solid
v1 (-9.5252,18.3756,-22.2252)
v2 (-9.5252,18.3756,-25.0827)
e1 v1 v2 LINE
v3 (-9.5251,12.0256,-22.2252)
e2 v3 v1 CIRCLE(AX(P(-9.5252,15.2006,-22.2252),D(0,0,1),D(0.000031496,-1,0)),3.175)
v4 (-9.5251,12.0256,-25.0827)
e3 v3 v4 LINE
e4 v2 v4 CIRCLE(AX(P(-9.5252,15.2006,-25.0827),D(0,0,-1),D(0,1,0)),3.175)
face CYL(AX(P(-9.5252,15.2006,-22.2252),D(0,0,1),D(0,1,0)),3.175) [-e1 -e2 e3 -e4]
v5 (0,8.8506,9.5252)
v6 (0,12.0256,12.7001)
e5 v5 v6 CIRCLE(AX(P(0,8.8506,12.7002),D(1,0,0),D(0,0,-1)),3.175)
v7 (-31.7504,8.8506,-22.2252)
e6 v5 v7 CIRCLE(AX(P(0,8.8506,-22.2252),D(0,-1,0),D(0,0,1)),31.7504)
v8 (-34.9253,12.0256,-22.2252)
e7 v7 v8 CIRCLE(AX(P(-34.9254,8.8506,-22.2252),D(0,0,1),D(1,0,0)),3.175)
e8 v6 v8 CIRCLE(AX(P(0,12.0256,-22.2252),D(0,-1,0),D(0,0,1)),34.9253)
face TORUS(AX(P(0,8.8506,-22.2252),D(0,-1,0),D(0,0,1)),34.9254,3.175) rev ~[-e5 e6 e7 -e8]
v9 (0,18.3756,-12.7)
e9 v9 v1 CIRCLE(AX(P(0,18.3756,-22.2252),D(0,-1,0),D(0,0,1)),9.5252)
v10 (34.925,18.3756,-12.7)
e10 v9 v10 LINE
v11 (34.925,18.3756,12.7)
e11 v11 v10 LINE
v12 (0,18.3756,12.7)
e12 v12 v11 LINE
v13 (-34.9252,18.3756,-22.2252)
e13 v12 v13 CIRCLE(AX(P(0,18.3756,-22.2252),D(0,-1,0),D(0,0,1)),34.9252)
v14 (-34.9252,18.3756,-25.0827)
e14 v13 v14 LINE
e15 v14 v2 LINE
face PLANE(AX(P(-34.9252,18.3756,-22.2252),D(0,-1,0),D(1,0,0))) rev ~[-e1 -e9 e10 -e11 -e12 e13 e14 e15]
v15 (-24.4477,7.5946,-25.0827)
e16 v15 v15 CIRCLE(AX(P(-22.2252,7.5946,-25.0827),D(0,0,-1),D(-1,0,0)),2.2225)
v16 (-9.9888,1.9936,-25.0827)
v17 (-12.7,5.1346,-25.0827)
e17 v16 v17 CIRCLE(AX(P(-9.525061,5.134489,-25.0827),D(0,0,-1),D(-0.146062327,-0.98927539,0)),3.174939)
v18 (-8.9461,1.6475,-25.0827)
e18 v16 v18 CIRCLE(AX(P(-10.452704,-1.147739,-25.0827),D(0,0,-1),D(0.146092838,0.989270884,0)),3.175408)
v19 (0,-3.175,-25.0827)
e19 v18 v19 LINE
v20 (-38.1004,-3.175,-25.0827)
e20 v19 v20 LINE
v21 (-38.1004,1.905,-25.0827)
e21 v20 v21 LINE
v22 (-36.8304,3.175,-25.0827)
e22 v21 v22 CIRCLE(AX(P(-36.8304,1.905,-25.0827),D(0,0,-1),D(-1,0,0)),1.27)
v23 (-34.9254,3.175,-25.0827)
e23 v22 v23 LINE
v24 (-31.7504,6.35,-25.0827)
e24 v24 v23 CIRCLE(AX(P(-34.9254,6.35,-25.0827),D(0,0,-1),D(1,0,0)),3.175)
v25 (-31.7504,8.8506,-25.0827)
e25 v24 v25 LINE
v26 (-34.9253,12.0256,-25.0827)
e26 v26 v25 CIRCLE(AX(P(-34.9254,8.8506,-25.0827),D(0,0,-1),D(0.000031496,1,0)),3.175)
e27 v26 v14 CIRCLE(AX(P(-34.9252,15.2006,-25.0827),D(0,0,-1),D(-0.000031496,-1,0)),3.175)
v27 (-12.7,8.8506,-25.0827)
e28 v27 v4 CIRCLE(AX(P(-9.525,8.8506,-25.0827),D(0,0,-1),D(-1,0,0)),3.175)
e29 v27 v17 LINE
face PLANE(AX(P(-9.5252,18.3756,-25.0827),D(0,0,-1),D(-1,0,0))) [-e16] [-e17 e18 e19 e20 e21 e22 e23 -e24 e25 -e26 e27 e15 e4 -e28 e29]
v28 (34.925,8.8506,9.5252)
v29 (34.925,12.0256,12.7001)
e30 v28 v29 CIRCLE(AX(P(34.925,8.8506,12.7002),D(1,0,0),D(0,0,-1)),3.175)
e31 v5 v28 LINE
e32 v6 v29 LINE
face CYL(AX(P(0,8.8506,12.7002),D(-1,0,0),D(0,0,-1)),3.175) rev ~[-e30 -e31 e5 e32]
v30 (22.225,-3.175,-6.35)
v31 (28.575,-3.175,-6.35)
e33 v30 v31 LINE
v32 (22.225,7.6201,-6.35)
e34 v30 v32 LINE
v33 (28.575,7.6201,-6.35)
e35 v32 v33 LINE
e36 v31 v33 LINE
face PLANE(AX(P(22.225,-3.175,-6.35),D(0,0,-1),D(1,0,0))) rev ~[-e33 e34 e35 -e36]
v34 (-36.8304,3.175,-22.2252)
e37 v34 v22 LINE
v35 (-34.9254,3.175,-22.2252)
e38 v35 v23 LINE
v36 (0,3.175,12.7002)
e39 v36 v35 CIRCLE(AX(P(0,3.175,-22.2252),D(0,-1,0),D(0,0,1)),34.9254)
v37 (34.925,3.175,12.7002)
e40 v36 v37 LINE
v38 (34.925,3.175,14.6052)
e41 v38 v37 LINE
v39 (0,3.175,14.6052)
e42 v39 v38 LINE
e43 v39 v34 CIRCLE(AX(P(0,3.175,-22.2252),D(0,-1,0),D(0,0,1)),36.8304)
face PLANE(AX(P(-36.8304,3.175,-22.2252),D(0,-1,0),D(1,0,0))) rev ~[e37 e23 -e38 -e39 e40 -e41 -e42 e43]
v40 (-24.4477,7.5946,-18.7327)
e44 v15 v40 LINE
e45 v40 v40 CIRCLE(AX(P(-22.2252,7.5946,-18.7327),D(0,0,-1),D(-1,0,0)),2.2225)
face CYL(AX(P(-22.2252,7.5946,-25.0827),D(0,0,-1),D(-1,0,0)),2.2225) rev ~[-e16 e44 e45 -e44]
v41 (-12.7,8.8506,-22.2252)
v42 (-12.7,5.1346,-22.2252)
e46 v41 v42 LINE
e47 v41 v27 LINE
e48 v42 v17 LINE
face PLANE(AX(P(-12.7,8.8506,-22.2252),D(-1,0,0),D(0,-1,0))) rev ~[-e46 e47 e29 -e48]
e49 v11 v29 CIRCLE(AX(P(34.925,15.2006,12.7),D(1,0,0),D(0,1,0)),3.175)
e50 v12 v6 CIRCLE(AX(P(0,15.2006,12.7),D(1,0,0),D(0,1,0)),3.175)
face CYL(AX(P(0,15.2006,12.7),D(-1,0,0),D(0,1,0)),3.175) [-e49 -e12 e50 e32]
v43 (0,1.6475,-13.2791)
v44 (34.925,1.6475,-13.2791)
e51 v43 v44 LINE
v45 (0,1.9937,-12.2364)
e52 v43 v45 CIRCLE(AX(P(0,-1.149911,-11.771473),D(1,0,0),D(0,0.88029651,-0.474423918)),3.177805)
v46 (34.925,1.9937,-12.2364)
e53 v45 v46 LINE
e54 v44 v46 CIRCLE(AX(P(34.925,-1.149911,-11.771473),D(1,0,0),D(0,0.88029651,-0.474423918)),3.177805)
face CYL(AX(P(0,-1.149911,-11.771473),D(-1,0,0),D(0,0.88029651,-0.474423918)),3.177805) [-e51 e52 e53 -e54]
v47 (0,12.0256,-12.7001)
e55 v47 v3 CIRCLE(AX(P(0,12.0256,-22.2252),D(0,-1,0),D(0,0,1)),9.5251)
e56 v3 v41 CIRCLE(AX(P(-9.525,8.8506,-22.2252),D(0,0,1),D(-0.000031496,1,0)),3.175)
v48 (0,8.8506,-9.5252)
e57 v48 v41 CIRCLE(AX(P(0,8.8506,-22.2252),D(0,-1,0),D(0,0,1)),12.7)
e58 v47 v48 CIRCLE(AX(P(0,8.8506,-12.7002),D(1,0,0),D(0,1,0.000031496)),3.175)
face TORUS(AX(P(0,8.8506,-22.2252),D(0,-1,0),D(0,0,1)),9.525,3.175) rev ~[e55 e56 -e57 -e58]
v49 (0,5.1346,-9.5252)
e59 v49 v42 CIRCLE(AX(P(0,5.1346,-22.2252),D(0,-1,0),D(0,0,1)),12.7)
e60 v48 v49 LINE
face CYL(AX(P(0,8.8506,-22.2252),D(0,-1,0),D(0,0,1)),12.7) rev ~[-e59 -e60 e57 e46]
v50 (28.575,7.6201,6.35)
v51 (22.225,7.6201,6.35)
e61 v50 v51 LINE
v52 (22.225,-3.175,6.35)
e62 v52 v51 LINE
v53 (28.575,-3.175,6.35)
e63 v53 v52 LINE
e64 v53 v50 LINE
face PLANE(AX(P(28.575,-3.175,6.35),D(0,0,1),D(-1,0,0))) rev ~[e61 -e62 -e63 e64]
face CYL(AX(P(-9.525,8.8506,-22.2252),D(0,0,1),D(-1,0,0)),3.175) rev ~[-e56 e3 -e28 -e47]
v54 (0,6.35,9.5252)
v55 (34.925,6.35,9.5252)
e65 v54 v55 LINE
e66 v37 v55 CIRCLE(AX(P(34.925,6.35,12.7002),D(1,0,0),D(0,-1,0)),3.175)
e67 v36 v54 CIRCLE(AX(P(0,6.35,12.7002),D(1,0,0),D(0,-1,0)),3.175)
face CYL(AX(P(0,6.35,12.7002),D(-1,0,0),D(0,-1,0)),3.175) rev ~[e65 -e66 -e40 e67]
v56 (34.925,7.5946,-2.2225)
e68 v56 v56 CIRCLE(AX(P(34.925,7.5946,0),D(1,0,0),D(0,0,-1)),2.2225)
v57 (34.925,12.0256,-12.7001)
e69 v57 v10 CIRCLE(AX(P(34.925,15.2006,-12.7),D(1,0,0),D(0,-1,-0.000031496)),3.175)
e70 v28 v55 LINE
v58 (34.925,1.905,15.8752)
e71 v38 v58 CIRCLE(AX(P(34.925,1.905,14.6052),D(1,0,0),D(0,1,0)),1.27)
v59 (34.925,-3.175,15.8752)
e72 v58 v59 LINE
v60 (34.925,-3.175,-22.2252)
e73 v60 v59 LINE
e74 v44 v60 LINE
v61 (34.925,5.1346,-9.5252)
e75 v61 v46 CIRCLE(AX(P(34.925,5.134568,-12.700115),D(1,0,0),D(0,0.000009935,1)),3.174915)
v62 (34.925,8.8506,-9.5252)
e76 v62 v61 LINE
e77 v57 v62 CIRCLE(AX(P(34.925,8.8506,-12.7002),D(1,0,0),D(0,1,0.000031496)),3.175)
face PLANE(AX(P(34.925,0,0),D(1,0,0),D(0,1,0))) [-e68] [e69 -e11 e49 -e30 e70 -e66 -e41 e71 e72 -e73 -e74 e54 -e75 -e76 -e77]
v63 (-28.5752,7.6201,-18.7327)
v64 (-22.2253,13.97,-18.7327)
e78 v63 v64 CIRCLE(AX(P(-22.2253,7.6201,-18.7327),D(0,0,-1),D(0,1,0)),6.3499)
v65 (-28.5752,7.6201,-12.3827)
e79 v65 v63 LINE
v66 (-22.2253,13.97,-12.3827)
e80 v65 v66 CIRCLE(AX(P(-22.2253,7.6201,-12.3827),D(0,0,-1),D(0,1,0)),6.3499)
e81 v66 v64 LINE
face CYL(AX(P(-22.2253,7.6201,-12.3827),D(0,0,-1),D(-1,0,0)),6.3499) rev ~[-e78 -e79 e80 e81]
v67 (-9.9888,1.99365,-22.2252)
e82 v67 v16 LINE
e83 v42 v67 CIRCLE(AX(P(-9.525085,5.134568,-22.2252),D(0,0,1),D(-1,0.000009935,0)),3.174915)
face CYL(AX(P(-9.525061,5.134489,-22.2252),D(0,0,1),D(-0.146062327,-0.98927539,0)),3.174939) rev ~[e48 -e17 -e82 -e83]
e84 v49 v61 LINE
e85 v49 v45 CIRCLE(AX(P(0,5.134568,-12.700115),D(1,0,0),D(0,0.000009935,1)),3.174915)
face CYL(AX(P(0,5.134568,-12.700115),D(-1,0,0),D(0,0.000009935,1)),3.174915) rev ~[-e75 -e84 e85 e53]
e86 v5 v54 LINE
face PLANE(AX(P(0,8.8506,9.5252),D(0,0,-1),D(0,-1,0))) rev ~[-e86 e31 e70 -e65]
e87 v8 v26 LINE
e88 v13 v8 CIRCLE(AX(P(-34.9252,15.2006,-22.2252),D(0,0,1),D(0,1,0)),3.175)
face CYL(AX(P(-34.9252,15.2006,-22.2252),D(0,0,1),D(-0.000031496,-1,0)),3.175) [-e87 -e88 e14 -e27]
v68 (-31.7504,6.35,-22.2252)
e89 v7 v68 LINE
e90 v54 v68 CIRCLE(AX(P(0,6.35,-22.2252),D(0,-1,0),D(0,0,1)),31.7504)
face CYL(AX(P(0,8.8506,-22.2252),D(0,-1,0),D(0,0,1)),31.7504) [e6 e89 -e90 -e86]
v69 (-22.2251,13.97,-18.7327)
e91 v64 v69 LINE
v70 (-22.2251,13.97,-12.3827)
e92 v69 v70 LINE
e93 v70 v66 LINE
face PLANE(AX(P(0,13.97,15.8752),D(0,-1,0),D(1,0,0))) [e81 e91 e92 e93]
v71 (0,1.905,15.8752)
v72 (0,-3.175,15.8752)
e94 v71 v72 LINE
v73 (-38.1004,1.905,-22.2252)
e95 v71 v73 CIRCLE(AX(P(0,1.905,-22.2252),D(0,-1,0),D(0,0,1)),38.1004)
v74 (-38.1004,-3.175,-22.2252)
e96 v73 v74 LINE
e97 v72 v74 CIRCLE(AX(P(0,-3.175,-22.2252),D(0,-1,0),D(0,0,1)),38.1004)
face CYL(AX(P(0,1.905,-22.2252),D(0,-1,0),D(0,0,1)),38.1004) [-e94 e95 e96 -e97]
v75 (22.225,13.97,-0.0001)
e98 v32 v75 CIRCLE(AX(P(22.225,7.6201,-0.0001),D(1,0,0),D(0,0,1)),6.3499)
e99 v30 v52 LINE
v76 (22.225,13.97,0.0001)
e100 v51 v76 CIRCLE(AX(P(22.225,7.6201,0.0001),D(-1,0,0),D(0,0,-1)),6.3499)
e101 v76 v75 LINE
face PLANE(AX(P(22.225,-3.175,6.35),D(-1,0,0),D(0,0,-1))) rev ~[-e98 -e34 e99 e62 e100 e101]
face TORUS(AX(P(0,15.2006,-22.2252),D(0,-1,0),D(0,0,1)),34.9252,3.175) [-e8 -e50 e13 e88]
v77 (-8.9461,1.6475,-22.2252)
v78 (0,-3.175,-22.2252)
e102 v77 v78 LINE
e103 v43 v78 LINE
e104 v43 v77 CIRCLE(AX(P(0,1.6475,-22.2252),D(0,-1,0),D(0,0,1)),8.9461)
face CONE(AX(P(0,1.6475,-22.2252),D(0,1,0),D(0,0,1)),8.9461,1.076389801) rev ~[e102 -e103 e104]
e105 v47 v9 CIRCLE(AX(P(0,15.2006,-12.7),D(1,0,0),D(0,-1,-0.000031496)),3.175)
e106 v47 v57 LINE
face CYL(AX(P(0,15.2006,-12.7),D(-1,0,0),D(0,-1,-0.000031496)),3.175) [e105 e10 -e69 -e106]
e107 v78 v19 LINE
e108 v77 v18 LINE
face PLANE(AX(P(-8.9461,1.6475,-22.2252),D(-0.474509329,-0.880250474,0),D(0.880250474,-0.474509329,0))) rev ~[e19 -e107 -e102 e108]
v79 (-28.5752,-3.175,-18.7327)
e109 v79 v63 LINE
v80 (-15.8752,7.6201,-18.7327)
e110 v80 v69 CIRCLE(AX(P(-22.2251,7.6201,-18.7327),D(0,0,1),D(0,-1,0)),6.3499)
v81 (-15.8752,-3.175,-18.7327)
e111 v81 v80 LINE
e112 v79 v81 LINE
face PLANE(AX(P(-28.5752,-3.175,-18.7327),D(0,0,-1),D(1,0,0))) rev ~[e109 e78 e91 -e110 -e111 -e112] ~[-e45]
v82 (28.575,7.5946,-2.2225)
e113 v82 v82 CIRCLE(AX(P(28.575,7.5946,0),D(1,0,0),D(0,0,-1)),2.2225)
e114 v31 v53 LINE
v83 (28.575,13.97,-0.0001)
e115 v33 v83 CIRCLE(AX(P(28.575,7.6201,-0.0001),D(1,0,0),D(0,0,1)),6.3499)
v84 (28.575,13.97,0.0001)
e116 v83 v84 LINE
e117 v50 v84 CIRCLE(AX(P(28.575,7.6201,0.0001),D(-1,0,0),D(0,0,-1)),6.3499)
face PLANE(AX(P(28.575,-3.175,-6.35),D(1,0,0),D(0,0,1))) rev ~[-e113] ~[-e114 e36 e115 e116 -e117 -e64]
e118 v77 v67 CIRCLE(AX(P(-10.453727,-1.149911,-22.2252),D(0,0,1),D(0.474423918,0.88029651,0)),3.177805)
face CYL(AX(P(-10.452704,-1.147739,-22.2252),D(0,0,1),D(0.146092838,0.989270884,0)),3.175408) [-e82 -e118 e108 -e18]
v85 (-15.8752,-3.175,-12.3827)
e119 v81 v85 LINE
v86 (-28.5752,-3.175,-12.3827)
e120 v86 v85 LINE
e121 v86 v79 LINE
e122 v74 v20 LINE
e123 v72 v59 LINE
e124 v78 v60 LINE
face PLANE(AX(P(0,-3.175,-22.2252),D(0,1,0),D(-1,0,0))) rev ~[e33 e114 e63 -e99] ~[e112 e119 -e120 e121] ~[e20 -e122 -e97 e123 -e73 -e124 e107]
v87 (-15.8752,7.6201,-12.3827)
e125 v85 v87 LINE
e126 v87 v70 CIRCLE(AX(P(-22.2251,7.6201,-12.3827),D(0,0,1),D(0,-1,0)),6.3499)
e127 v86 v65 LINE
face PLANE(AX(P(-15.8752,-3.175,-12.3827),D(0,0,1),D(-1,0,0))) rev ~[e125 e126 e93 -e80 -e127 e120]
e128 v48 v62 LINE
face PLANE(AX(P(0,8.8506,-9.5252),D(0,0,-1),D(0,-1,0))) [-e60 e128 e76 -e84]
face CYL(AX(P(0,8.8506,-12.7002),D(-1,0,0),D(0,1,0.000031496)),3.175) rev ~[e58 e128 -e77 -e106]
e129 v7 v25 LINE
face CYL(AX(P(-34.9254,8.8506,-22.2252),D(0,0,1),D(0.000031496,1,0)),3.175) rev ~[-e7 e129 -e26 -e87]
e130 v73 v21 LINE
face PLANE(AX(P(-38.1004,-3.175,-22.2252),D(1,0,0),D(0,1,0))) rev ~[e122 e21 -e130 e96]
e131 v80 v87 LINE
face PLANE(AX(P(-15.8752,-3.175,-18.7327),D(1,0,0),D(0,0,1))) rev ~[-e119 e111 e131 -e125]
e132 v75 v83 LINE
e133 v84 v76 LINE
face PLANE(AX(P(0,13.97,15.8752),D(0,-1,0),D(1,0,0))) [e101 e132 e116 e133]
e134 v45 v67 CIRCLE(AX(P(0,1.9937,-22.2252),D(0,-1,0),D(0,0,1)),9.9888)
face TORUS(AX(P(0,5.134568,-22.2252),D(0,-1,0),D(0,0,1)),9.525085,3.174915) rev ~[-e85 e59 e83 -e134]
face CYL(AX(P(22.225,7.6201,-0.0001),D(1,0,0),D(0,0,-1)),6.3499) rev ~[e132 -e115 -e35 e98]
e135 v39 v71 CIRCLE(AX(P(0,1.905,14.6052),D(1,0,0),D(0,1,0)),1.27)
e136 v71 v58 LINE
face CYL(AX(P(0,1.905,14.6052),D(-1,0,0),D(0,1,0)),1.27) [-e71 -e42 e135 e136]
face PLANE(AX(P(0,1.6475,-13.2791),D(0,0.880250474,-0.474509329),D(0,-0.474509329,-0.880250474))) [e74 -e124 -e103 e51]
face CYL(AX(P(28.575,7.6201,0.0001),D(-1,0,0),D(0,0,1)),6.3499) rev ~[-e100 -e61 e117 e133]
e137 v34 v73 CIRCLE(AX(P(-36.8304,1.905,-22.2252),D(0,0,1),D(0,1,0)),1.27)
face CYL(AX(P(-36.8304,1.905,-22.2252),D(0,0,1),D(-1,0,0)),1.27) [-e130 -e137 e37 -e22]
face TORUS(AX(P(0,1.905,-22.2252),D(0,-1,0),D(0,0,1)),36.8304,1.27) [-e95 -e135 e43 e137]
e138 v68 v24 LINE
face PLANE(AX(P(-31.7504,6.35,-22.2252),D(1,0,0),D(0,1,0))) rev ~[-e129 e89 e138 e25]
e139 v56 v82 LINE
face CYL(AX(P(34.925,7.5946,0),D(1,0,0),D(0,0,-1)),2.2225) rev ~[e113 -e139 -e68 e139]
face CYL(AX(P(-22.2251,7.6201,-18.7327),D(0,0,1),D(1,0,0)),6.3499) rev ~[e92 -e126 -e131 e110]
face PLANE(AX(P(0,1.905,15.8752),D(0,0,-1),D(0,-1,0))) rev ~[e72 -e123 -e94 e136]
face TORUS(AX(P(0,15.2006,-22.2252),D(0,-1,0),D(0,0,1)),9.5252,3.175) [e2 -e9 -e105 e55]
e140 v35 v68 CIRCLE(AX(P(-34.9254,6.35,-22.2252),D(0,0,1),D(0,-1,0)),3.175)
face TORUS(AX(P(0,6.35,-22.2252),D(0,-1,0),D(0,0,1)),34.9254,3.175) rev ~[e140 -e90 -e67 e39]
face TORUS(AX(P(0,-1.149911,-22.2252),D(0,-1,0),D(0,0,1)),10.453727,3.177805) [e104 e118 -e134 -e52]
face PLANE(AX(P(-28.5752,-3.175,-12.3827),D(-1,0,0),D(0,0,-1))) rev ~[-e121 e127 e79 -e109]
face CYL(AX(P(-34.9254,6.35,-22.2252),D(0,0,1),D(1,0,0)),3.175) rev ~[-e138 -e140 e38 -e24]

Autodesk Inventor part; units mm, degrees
ref_plane "YZ Plane" through (0, 0, 0) normal (1, 0, 0) x (0, 1, 0)
ref_plane "XZ Plane" through (0, 0, 0) normal (0, 1, 0) x (-1, 0, 0)
ref_plane "XY Plane" through (0, 0, 0) normal (0, 0, 1) x (1, 0, 0)
sketch "Sketch1" plane through (0, 0, 0) normal (1, 0, 0) x (0, 1, 0)
  line L0 (-3.175, -15.8752) -> (-3.175, 15.8752)
  line L1 (-3.175, 15.8752) -> (1.9596, -9.7981) construction
  line L2 (3.175, 15.8752) -> (-3.175, -15.8752) construction
  arc A0 (18.3756, 12.7) -> (12.0256, 12.7001) centre (15.2006, 12.7) ccw
  arc A1 (12.0256, -12.7001) -> (18.3756, -12.7) centre (15.2006, -12.7) ccw
  line L3 (8.8506, 9.5252) -> (6.35, 9.5252)
  line L4 (8.8506, -9.5252) -> (5.1346, -9.5252)
  line L5 (15.2006, 12.7) -> (15.2006, -12.7) construction
  line L6 (3.175, 14.6052) -> (3.175, 12.7002)
  arc A2 (8.8506, 9.5252) -> (12.0256, 12.7001) centre (8.8506, 12.7002) ccw
  arc A3 (12.0256, -12.7001) -> (8.8506, -9.5252) centre (8.8506, -12.7002) ccw
  arc A4 (3.175, 12.7002) -> (6.35, 9.5252) centre (6.35, 12.7002) ccw
  arc A5 (5.1346, -9.5252) -> (1.9937, -12.2364) centre (5.1346, -12.7002) ccw
  line L7 (-3.175, -15.8752) -> (-3.175, -22.2252)
  line L8 (1.905, 15.8752) -> (-3.175, 15.8752)
  arc A6 (3.175, 14.6052) -> (1.905, 15.8752) centre (1.905, 14.6052) ccw
  line L9 (18.3756, 12.7) -> (18.3756, -12.7)
  line L10 (1.6475, -13.2791) -> (-3.175, -22.2252)
  arc A7 (1.6475, -13.2791) -> (1.9937, -12.2364) centre (-1.1473, -11.7726) ccw
  line L11 (-3.175, -22.2252) -> (20.4919, -22.2252)
  point P0 (0, 0)
  point P1 (15.2367, 9.5252)
  point P2 (15.2367, -9.5252)
  point P3 (1.9596, -12.7002)
  dimension "d5" = 6.35
  dimension "d8" = 3.175
  dimension "d9" = 6.35
  dimension "d11" = 6.35
  dimension "d12" = 6.35
  dimension "d13" = 1.27
  dimension "d30" = 25.4
  dimension "d31" = 3.175
revolve "Revolution1" add sketch "Sketch1" angle 90 about axis through (0, -3.175, -22.2252) along (0, -1, 0)
extrude "Extrusion2" add sketch "Sketch1" along normal blind 34.925
sketch "Sketch2" plane through (-9.5252, 18.3756, -22.2252) normal (0, 0, -1) x (-1, 0, 0)
  line L0 (-9.5252, -21.5506) -> (28.5752, -21.5506) projected
  line L1 (28.5752, -21.5506) -> (28.5752, -16.4706) projected
  arc A0 (28.5752, -16.4706) -> (27.3052, -15.2006) centre (27.3052, -16.4706) ccw projected
  line L2 (27.3052, -15.2006) -> (25.4002, -15.2006) projected
  arc A1 (22.2252, -12.0256) -> (25.4002, -15.2006) centre (25.4002, -12.0256) ccw projected
  line L3 (22.2252, -12.0256) -> (22.2252, -9.525) projected
  arc A2 (25.4001, -6.35) -> (22.2252, -9.525) centre (25.4002, -9.525) ccw projected
  arc A3 (25.4001, -6.35) -> (25.4, 0) centre (25.4, -3.175) ccw projected
  line L4 (25.4, 0) -> (0, 0) projected
  arc A4 (0, 0) -> (-0.0001, -6.35) centre (0, -3.175) ccw projected
  arc A5 (3.1748, -9.525) -> (-0.0001, -6.35) centre (-0.0002, -9.525) ccw projected
  line L5 (3.1748, -9.525) -> (3.1748, -13.241) projected
  arc A6 (0.4636, -16.382) -> (3.1748, -13.241) centre (-0.0002, -13.241) ccw projected
  arc A7 (0.4636, -16.382) -> (-0.5791, -16.7281) centre (0.9274, -19.5229) ccw projected
  line L6 (-0.5791, -16.7281) -> (-9.5252, -21.5506) projected
  point P0 (-9.5252, -18.3756)
extrude "Extrusion3" add sketch "Sketch2" along normal blind 2.8575
sketch "Sketch5" plane through (34.925, 0, 0) normal (1, 0, 0) x (0, 0, -1)
  circle A0 centre (0, 7.5946) radius 2.2225
  line L0 (-15.8752, -3.175) -> (22.2252, -3.175) projected
  point P0 (0, 0)
  dimension "d26" = 4.445
  dimension "d27" = 10.7696
extrude "Extrusion4" cut sketch "Sketch5" against normal blind 12.7
sketch "Sketch6" plane through (-9.5252, 18.3756, -25.0827) normal (0, 0, -1) x (-1, 0, 0)
  line L0 (3.1748, -9.525) -> (3.1748, -13.241) projected
  line L1 (3.1748, -10.781) -> (22.2252, -10.781) construction
  line L2 (22.2252, -12.0256) -> (22.2252, -9.525) projected
  circle A0 centre (12.7, -10.781) radius 2.2225
  line L3 (-9.5252, -21.5506) -> (28.5752, -21.5506) projected
  point P0 (-9.5252, -18.3756)
  dimension "d32" = 4.445
  dimension "d33" = 10.7696
extrude "Extrusion5" cut sketch "Sketch6" against normal blind 12.7
sketch "Sketch7" plane through (0, -3.175, 15.8752) normal (0, -1, 0) x (1, 0, 0)
  line L0 (22.225, -13.6527) -> (22.225, -18.0977) projected
  line L1 (34.925, -13.6527) -> (34.925, -18.0977) projected
  line L2 (-20.0027, -28.2579) -> (-24.4477, -28.2579) projected
  line L3 (-20.0027, -40.9579) -> (-24.4477, -40.9579) projected
  line L4 (34.925, 0) -> (34.925, -38.1004) projected
  line L5 (34.925, -15.8752) -> (28.575, -15.8752) construction
  line L6 (22.225, -22.2252) -> (28.575, -22.2252)
  line L7 (28.575, -22.2252) -> (28.575, -9.5252)
  line L8 (28.575, -9.5252) -> (22.225, -9.5252)
  line L9 (22.225, -9.5252) -> (22.225, -22.2252)
  line L10 (22.225, -22.2252) -> (28.575, -9.5252) construction
  line L11 (28.575, -22.2252) -> (22.225, -9.5252) construction
  line L12 (0, -40.9579) -> (-38.1004, -40.9579) projected
  line L13 (-22.2252, -40.9579) -> (-22.2252, -34.6079) construction
  line L14 (-15.8752, -28.2579) -> (-28.5752, -28.2579)
  line L15 (-28.5752, -28.2579) -> (-28.5752, -34.6079)
  line L16 (-28.5752, -34.6079) -> (-15.8752, -34.6079)
  line L17 (-15.8752, -34.6079) -> (-15.8752, -28.2579)
  line L18 (-15.8752, -28.2579) -> (-28.5752, -34.6079) construction
  line L19 (-28.5752, -28.2579) -> (-15.8752, -34.6079) construction
  point P0 (0, -15.8752)
  point P1 (25.4, -15.8752)
  point P2 (-22.2252, -31.4329)
  dimension "d41" = 6.35
  dimension "d42" = 6.35
  dimension "d43" = 12.7
  dimension "d44" = 6.35
extrude "Extrusion6" cut sketch "Sketch7" against normal blind 17.145
fillet "Fillet1" radius 6.35 4 edges at (25.4, 13.97, 6.35) (25.4, 13.97, -6.35) (-28.5752, 13.97, -15.5577) (-15.8752, 13.97, -15.5577)
properties part number "Rail Corner" material "Acetal Resin, Black"
